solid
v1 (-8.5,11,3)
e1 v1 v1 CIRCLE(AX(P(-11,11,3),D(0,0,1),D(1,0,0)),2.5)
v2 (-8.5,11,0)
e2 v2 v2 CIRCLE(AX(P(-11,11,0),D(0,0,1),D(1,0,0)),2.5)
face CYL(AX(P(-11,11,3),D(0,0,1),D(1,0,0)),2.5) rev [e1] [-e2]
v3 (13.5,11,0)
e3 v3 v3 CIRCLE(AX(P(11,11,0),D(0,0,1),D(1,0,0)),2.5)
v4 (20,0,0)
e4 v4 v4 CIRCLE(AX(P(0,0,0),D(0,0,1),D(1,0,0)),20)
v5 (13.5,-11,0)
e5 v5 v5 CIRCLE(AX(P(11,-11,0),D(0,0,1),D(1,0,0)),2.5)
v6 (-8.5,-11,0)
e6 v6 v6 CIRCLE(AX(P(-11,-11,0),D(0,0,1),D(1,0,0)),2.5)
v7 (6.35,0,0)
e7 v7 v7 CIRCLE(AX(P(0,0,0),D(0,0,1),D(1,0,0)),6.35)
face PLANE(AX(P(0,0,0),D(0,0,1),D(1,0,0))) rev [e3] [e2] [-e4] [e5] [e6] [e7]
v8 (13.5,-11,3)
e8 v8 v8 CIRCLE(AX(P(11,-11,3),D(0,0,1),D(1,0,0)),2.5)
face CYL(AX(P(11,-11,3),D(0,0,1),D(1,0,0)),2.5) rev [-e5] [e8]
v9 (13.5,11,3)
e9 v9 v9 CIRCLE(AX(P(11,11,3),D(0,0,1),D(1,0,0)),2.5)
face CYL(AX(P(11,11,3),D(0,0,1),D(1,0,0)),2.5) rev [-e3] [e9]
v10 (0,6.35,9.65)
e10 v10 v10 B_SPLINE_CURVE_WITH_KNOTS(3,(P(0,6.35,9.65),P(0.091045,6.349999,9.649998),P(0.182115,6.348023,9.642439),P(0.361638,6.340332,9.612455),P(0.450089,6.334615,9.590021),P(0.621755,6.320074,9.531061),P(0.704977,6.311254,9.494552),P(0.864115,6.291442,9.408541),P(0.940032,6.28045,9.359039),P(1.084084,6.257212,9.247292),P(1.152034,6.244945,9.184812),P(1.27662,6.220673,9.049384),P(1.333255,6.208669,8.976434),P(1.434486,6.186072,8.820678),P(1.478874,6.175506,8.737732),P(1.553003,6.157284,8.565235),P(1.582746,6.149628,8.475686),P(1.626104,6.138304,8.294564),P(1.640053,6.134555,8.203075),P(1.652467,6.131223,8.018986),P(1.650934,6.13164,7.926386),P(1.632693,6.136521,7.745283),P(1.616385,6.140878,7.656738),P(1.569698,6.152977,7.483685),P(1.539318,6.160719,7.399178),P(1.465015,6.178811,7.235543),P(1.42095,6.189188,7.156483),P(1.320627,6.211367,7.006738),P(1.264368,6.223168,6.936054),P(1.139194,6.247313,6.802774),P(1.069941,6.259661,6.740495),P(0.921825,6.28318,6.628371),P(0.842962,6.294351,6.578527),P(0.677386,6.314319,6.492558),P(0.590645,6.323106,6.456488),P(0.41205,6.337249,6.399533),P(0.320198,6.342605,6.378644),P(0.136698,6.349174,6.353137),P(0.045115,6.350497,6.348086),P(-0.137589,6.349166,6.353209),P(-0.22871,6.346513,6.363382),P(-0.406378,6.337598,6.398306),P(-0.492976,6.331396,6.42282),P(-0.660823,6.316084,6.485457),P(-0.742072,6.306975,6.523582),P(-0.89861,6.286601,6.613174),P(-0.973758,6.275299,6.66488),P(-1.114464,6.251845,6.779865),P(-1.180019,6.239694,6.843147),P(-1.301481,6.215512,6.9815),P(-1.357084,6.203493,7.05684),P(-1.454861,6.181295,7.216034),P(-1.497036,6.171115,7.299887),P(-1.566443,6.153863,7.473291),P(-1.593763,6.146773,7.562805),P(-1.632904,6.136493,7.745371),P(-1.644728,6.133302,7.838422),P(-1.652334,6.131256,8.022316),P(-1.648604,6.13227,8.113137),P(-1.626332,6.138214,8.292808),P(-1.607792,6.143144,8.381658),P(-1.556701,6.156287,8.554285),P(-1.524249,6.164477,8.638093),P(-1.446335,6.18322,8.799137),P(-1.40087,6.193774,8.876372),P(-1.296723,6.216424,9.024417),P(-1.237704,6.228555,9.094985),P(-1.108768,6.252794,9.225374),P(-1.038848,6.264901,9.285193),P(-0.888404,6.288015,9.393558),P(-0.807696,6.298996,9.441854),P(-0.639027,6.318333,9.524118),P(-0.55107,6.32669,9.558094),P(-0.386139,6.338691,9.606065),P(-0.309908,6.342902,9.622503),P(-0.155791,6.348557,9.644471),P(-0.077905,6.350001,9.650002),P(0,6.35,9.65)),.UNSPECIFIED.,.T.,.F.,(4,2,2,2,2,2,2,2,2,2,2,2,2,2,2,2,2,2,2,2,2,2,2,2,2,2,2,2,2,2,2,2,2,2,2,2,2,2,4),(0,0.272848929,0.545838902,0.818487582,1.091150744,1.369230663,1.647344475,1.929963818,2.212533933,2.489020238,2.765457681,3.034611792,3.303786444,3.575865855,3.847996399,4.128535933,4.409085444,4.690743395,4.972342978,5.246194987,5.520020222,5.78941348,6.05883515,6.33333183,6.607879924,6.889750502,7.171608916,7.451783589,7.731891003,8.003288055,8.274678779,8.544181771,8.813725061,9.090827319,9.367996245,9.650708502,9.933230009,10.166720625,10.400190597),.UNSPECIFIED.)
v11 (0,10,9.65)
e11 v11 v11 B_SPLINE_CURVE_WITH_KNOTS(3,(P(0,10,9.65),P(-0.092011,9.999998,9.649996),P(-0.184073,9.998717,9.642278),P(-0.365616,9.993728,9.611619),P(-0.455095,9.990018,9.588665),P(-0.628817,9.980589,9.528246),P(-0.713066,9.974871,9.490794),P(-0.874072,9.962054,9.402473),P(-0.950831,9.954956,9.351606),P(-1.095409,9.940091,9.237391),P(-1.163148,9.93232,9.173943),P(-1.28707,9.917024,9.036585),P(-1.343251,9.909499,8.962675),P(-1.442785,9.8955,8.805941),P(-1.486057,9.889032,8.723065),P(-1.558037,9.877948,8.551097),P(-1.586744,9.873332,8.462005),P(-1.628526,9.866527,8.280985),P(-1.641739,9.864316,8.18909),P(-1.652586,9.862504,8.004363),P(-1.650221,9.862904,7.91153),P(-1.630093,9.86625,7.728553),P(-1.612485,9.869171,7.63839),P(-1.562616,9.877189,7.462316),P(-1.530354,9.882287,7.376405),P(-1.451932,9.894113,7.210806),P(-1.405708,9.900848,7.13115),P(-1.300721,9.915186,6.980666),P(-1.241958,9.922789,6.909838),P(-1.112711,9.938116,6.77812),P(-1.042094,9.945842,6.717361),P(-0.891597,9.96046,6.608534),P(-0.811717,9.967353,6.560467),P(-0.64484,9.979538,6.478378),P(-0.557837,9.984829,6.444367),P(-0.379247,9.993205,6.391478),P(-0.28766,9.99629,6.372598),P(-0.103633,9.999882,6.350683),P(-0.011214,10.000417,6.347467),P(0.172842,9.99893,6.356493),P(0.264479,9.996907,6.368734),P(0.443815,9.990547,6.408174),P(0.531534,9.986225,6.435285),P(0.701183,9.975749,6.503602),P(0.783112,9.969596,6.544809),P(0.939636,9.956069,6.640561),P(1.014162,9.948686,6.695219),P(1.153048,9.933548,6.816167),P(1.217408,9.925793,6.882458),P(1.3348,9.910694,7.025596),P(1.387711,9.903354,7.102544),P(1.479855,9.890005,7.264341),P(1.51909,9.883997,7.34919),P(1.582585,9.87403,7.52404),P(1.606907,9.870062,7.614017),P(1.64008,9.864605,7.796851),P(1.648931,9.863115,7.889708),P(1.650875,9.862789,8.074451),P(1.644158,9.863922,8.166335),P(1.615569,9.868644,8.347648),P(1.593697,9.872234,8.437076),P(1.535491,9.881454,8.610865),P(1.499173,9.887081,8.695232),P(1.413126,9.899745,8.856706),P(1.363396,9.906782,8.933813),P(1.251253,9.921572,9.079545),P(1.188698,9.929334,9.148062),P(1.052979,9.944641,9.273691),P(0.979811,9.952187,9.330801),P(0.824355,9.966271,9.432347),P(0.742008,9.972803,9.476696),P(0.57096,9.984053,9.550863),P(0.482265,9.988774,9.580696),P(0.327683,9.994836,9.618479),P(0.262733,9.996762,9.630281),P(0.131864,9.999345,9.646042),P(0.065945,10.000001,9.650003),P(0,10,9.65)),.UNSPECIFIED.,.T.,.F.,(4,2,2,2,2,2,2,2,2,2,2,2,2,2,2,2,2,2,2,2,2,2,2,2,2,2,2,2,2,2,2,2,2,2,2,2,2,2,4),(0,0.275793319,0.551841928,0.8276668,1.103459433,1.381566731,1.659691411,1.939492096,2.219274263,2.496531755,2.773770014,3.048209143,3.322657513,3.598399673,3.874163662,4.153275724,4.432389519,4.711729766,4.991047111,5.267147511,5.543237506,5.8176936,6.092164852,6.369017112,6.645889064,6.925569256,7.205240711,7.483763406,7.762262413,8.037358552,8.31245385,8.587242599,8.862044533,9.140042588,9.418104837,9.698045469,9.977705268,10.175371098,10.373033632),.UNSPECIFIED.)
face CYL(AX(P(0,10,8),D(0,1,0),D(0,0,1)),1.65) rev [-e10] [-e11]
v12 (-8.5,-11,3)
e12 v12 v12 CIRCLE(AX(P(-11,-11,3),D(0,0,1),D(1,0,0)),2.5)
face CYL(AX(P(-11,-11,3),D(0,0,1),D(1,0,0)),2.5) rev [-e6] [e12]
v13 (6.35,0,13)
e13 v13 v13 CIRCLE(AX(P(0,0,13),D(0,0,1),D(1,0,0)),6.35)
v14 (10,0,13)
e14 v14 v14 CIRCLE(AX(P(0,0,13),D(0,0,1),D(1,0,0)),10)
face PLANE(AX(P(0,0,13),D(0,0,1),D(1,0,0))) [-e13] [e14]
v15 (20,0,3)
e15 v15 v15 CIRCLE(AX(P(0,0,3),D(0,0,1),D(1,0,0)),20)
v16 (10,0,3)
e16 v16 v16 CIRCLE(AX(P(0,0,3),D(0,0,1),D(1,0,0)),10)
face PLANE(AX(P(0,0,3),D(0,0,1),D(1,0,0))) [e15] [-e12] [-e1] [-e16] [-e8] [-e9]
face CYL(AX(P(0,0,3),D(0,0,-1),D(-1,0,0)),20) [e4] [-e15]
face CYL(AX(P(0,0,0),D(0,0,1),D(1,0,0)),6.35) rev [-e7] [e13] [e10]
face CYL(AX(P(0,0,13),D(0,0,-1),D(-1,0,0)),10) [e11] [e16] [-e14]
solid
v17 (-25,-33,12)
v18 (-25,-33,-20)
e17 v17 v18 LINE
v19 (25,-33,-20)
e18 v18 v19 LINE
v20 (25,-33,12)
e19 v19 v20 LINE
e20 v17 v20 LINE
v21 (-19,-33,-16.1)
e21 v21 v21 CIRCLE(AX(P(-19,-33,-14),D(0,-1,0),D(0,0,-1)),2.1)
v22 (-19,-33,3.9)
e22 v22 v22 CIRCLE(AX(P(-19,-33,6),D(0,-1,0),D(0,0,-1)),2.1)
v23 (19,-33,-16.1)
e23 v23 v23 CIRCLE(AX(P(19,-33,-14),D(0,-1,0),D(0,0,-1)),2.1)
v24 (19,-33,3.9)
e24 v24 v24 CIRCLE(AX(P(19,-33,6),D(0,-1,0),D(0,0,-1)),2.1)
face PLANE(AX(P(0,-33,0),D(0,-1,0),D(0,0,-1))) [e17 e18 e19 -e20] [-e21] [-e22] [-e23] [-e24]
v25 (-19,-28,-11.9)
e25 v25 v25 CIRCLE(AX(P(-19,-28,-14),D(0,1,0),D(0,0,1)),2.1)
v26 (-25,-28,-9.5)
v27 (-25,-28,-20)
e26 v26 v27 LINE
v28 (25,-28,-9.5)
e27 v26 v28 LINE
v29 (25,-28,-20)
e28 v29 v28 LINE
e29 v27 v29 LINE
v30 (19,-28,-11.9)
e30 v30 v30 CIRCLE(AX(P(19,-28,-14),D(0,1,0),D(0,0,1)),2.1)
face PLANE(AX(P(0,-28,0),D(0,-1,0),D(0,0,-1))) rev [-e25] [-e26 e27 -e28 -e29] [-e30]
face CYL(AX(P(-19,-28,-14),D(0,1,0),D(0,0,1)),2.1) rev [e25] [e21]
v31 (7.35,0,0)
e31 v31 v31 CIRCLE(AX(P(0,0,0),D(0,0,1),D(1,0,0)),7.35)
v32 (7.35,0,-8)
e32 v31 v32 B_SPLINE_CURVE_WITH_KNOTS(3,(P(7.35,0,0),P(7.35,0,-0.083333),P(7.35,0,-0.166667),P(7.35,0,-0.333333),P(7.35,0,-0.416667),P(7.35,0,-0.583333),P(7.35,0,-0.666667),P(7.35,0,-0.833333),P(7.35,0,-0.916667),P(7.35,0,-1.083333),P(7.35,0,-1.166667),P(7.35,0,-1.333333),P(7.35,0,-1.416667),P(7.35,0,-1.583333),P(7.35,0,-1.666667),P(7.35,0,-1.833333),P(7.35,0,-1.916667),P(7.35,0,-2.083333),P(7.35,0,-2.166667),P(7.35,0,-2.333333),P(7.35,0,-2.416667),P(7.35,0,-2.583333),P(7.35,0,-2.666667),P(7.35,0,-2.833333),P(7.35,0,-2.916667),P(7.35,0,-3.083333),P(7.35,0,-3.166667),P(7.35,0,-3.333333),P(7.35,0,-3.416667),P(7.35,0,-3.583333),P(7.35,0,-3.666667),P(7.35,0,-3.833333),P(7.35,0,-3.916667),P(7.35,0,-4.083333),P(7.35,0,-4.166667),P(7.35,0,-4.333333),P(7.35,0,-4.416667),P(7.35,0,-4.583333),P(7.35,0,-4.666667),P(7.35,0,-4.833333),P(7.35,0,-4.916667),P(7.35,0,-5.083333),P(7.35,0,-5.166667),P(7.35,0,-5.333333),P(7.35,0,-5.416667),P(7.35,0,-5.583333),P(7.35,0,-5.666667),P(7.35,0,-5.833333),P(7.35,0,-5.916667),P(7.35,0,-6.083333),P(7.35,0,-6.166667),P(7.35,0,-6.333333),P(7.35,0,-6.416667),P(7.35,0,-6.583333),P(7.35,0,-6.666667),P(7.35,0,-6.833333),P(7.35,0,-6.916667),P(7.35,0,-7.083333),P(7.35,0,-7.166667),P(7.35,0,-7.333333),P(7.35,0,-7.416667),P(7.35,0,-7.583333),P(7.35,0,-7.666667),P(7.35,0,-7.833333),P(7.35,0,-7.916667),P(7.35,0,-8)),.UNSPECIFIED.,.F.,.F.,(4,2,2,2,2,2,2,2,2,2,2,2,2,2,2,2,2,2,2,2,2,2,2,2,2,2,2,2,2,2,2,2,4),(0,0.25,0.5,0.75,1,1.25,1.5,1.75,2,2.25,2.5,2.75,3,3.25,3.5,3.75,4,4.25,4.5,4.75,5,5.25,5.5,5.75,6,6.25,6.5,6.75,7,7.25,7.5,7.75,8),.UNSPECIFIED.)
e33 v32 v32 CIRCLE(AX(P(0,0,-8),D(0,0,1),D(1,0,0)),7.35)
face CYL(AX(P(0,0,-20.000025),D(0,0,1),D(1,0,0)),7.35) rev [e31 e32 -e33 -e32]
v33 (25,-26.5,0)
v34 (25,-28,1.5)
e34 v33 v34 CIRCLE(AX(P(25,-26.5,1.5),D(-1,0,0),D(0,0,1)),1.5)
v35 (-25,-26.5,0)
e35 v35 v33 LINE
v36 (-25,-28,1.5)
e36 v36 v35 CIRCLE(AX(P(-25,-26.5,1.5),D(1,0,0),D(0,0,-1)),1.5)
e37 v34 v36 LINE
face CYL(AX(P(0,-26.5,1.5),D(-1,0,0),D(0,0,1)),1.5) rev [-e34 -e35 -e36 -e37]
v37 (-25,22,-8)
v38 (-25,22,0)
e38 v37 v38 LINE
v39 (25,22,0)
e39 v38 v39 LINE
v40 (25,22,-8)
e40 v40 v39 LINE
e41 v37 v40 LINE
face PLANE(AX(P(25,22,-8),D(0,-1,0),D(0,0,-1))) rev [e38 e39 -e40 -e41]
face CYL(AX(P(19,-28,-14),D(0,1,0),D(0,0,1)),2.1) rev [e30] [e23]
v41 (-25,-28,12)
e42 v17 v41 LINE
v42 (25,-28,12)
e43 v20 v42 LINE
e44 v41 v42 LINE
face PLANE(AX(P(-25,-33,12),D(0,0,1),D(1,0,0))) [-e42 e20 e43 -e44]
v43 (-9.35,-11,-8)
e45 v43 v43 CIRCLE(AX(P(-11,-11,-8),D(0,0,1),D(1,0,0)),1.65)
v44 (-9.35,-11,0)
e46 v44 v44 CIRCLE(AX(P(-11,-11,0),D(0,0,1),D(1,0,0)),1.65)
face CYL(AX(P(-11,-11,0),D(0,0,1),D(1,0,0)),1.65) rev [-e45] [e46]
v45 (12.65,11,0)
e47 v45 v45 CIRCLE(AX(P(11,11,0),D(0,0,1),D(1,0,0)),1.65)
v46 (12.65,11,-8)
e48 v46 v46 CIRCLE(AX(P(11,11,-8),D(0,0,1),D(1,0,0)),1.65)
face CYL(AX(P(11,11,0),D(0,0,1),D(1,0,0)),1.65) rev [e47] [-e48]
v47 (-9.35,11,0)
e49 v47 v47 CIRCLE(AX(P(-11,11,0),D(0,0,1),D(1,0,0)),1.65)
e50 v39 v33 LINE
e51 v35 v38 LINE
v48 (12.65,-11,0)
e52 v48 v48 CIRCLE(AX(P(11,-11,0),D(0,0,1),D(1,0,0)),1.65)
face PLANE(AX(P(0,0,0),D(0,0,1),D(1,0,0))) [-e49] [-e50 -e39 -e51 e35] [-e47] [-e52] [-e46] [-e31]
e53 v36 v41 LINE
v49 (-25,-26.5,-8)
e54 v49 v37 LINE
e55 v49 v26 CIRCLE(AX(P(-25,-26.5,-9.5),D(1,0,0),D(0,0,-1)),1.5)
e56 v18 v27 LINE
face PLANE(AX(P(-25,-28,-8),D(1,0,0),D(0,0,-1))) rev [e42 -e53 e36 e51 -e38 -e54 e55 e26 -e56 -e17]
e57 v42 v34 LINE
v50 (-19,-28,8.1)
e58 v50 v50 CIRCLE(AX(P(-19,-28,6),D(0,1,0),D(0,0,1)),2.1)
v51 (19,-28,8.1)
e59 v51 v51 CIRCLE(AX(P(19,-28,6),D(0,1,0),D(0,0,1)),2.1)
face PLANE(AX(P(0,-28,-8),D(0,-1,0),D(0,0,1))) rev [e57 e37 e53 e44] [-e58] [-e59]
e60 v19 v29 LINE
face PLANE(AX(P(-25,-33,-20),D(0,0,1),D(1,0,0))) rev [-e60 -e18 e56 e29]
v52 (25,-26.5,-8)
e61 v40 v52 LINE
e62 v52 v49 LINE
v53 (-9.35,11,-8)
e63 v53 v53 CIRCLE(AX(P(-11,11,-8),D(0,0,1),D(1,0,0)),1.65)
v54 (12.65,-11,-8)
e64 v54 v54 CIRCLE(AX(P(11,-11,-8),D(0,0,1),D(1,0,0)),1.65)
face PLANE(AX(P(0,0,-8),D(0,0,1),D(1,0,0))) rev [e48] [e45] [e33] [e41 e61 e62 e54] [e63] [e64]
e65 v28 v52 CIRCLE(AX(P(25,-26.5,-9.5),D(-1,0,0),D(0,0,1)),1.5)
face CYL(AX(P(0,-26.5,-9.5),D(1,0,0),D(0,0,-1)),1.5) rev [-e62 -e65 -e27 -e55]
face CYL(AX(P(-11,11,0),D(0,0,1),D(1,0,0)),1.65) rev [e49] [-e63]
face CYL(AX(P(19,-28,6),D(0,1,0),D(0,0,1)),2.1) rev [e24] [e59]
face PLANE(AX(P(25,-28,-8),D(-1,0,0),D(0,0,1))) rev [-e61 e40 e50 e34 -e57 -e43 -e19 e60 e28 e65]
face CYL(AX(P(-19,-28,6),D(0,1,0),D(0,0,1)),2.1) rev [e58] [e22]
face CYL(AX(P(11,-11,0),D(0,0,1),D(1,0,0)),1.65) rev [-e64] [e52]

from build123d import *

# Parameters (mm, degrees)
B01_SLIP_PLATE_CIRPATTERN1_START         = 18.556607454
B01_SLIP_PLATE_CIRPATTERN1_OUTLINE_R     = 20
B01_SLIP_PLATE_CIRPATTERN1_OUTLINE_R_2   = 2.5
B01_SLIP_PLATE_CIRPATTERN1_OUTLINE_R_3   = 6.35
B01_SLIP_PLATE_CIRPATTERN1_DEPTH         = 3
B01_SLIP_PLATE_CIRPATTERN1_START_2       = 21.556607454
B01_SLIP_PLATE_CIRPATTERN1_2_OUTLINE_R   = 10
B01_SLIP_PLATE_CIRPATTERN1_2_OUTLINE_R_2 = 6.35
B01_SLIP_PLATE_CIRPATTERN1_2_DEPTH       = 3.350001044
B01_SLIP_PLATE_CIRPATTERN1_START_3       = 28.206607555
B01_SLIP_PLATE_CIRPATTERN1_3_OUTLINE_R   = 10
B01_SLIP_PLATE_CIRPATTERN1_3_OUTLINE_R_2 = 6.35
B01_SLIP_PLATE_CIRPATTERN1_3_DEPTH       = 3.349999899
B01_SLIP_PLATE_CIRPATTERN1_START_4       = 24.906608498
B01_SLIP_PLATE_CIRPATTERN1_4_OUTLINE_R   = 10
B01_SLIP_PLATE_CIRPATTERN1_4_OUTLINE_R_2 = 6.35
B01_SLIP_PLATE_CIRPATTERN1_4_DEPTH       = 3.299999057
B01_SLIP_PLATE_CIRPATTERN1_START_5       = 15
B01_SLIP_PLATE_CIRPATTERN1_5_OUTLINE_R   = 1.65
B01_SLIP_PLATE_CIRPATTERN1_5_DEPTH       = 6
SKETCH5_W                                = 50
SKETCH5_H                                = 50
BOSS_EXTRUDE1_DEPTH                      = 8
SKETCH6_W                                = 1.65
SKETCH6_H                                = 8
M4_TAPPED_HOLE1_AT_2_COUNT               = 2
M4_TAPPED_HOLE1_AT_2_PITCH               = 22
M4_TAPPED_HOLE1_AT_3_COUNT               = 2
M4_TAPPED_HOLE1_AT_3_PITCH               = 31.112698372
M4_TAPPED_HOLE1_AT_4_COUNT               = 2
M4_TAPPED_HOLE1_AT_4_PITCH               = 22
SKETCH8_W                                = 50
SKETCH8_H                                = 16
BOSS_EXTRUDE2_DEPTH                      = 5
SKETCH10_W                               = 2.1
SKETCH10_H                               = 5.001
MIRROR2_COPY_1_SKETCH_W                  = 2.1
MIRROR2_COPY_1_SKETCH_H                  = 5.001
SKETCH11_R                               = 7.35
CUT_EXTRUDE1_DEPTH                       = 46.97825573
FILLET1_R                                = 1.5


with BuildPart() as part:
    # <B01_slip_plate>-<CirPattern1>: read off the stored shape, not the designer's step
    # <B01_slip_plate>-<CirPattern1> outline → <B01_slip_plate>-<CirPattern1> (new body)
    with BuildSketch(Plane.XY.offset(B01_SLIP_PLATE_CIRPATTERN1_START)):
        with Locations((-47.612606287, 9.667439862)):
            Circle(B01_SLIP_PLATE_CIRPATTERN1_OUTLINE_R)
        with Locations((-58.612606287, -1.332560138)):
            Circle(B01_SLIP_PLATE_CIRPATTERN1_OUTLINE_R_2, mode=Mode.SUBTRACT)
        with Locations((-36.612606287, -1.332560138)):
            Circle(B01_SLIP_PLATE_CIRPATTERN1_OUTLINE_R_2, mode=Mode.SUBTRACT)
        with Locations((-58.612606287, 20.667439862)):
            Circle(B01_SLIP_PLATE_CIRPATTERN1_OUTLINE_R_2, mode=Mode.SUBTRACT)
        with Locations((-36.612606287, 20.667439862)):
            Circle(B01_SLIP_PLATE_CIRPATTERN1_OUTLINE_R_2, mode=Mode.SUBTRACT)
        with Locations((-47.612606287, 9.667439862)):
            Circle(B01_SLIP_PLATE_CIRPATTERN1_OUTLINE_R_3, mode=Mode.SUBTRACT)
    extrude(amount=B01_SLIP_PLATE_CIRPATTERN1_DEPTH)

    # B01_slip_plate_-_CirPattern1 2 outline → B01_slip_plate_-_CirPattern1 2 (add)
    with BuildSketch(Plane.XY.offset(B01_SLIP_PLATE_CIRPATTERN1_START_2)):
        with Locations((-47.612606287, 9.667439862)):
            Circle(B01_SLIP_PLATE_CIRPATTERN1_2_OUTLINE_R)
        with Locations((-47.612606287, 9.667439862)):
            Circle(B01_SLIP_PLATE_CIRPATTERN1_2_OUTLINE_R_2, mode=Mode.SUBTRACT)
    extrude(amount=B01_SLIP_PLATE_CIRPATTERN1_2_DEPTH)



with BuildPart() as body_2:
    # B01_slip_plate_-_CirPattern1 3 outline → B01_slip_plate_-_CirPattern1 3 (new body)
    with BuildSketch(Plane.XY.offset(B01_SLIP_PLATE_CIRPATTERN1_START_3)):
        with Locations((-47.612606287, 9.667439862)):
            Circle(B01_SLIP_PLATE_CIRPATTERN1_3_OUTLINE_R)
        with Locations((-47.612606287, 9.667439862)):
            Circle(B01_SLIP_PLATE_CIRPATTERN1_3_OUTLINE_R_2, mode=Mode.SUBTRACT)
    extrude(amount=B01_SLIP_PLATE_CIRPATTERN1_3_DEPTH)


with BuildPart() as part_1:
    add(part.part)

    add(body_2.part)  # B01_slip_plate_-_CirPattern1 4 merges body 2
    # B01_slip_plate_-_CirPattern1 4 outline → B01_slip_plate_-_CirPattern1 4 (add)
    with BuildSketch(Plane.XY.offset(B01_SLIP_PLATE_CIRPATTERN1_START_4)):
        with Locations((-47.612606287, 9.667439862)):
            Circle(B01_SLIP_PLATE_CIRPATTERN1_4_OUTLINE_R)
        with Locations((-47.612606287, 9.667439862)):
            Circle(B01_SLIP_PLATE_CIRPATTERN1_4_OUTLINE_R_2, mode=Mode.SUBTRACT)
    extrude(amount=B01_SLIP_PLATE_CIRPATTERN1_4_DEPTH)

    # B01_slip_plate_-_CirPattern1 5 outline → B01_slip_plate_-_CirPattern1 5 (cut)
    with BuildSketch(Plane(origin=(0, 0, 0), x_dir=(1, 0, 0), z_dir=(0, 1, 0)).offset(B01_SLIP_PLATE_CIRPATTERN1_START_5)):
        with Locations((-47.612606287, -26.556607454)):
            Circle(B01_SLIP_PLATE_CIRPATTERN1_5_OUTLINE_R)
    extrude(amount=B01_SLIP_PLATE_CIRPATTERN1_5_DEPTH, mode=Mode.SUBTRACT)


with BuildPart() as part_2:
    # B01_slip_plate: read off the stored shape, not the designer's step
    # B01_slip_plate: moved
    add(part_1.part.moved(Location((47.6126063, -9.6674399, -18.5566075))))


with BuildPart() as body_2_2:
    # Sketch5 → Boss-Extrude1 (new body)
    with BuildSketch(Plane(origin=(0, 0, 0), x_dir=(-1, 0, 0), z_dir=(0, 0, -1))):
        with Locations((0, -3)):
            Rectangle(SKETCH5_W, SKETCH5_H)
    extrude(amount=BOSS_EXTRUDE1_DEPTH)

    # Sketch6 → M4 Tapped Hole1 (revolve, cut)
    with BuildSketch(Plane(origin=(-11, 11, 0), x_dir=(0, -1, 0), z_dir=(1, 0, 0))):
        with Locations((0.825, 4)):
            Rectangle(SKETCH6_W, SKETCH6_H)
    m4_tapped_hole1 = revolve(axis=Axis((-11, 11, 6.35), (0, 0, -1)), mode=Mode.SUBTRACT)

    # M4 Tapped Hole1 at 2: M4 Tapped Hole1 ×2
    with Locations(*[(i * M4_TAPPED_HOLE1_AT_2_PITCH, 0, 0) for i in range(1, M4_TAPPED_HOLE1_AT_2_COUNT)]):
        add(m4_tapped_hole1, mode=Mode.SUBTRACT)

    # M4 Tapped Hole1 at 3: M4 Tapped Hole1 ×2
    with Locations(*[Vector(0.7071067811865439, -0.7071067811865512, 0) * (i * M4_TAPPED_HOLE1_AT_3_PITCH) for i in range(1, M4_TAPPED_HOLE1_AT_3_COUNT)]):
        add(m4_tapped_hole1, mode=Mode.SUBTRACT)

    # M4 Tapped Hole1 at 4: M4 Tapped Hole1 ×2
    with Locations(*[(0, -i * M4_TAPPED_HOLE1_AT_4_PITCH, 0) for i in range(1, M4_TAPPED_HOLE1_AT_4_COUNT)]):
        add(m4_tapped_hole1, mode=Mode.SUBTRACT)

    # Sketch8 → Boss-Extrude2 (add)
    with BuildSketch(Plane.XZ.offset(28)):
        with Locations((0, -12)):
            Rectangle(SKETCH8_W, SKETCH8_H)
    boss_extrude2 = extrude(amount=BOSS_EXTRUDE2_DEPTH)

    # Sketch10 → Ø4.2 (4.2) Diameter Hole1 (revolve, cut)
    with BuildSketch(Plane(origin=(-19, -28, -14), x_dir=(0, 0, 1), z_dir=(1, 0, 0))):
        with Locations((1.05, 2.5005)):
            Rectangle(SKETCH10_W, SKETCH10_H)
    f_4_2_4_2_diameter_hole1 = revolve(axis=Axis((-19, -21.65, -14), (0, -1, 0)), mode=Mode.SUBTRACT)

    # Mirror1: Ø4.2 (4.2) Diameter Hole1 across plane
    add(f_4_2_4_2_diameter_hole1.mirror(Plane(origin=(0, 0, 0), x_dir=(0, 0, 1), z_dir=(1, 0, 0))), mode=Mode.SUBTRACT)

    # Mirror2: Boss-Extrude2, Ø4.2 (4.2) Diameter Hole1 across plane
    add(boss_extrude2.mirror(Plane.XY.offset(-4)))
    add(f_4_2_4_2_diameter_hole1.mirror(Plane.XY.offset(-4)), mode=Mode.SUBTRACT)

    # Mirror2 copy 1 sketch → Mirror2 copy 1 (revolve, cut)
    with BuildSketch(Plane(origin=(19, -28, 6), x_dir=(0, 0, -1), z_dir=(-1, 0, 0))):
        with Locations((1.05, 2.5005)):
            Rectangle(MIRROR2_COPY_1_SKETCH_W, MIRROR2_COPY_1_SKETCH_H)
    revolve(axis=Axis((19, -21.65, 6), (0, -1, 0)), mode=Mode.SUBTRACT)

    # Sketch11 → Cut-Extrude1 (cut, through all)
    with BuildSketch(Plane.XY):
        Circle(SKETCH11_R)
    extrude(amount=-CUT_EXTRUDE1_DEPTH, mode=Mode.SUBTRACT)

    # Fillet1
    fillet1_edges = [body_2_2.edges().sort_by_distance(p)[0] for p in [
        (0, -28, 0),
        (0, -28, -8),
    ]]
    fillet(fillet1_edges, radius=FILLET1_R)


solid = Compound([part_2.part, body_2_2.part])
